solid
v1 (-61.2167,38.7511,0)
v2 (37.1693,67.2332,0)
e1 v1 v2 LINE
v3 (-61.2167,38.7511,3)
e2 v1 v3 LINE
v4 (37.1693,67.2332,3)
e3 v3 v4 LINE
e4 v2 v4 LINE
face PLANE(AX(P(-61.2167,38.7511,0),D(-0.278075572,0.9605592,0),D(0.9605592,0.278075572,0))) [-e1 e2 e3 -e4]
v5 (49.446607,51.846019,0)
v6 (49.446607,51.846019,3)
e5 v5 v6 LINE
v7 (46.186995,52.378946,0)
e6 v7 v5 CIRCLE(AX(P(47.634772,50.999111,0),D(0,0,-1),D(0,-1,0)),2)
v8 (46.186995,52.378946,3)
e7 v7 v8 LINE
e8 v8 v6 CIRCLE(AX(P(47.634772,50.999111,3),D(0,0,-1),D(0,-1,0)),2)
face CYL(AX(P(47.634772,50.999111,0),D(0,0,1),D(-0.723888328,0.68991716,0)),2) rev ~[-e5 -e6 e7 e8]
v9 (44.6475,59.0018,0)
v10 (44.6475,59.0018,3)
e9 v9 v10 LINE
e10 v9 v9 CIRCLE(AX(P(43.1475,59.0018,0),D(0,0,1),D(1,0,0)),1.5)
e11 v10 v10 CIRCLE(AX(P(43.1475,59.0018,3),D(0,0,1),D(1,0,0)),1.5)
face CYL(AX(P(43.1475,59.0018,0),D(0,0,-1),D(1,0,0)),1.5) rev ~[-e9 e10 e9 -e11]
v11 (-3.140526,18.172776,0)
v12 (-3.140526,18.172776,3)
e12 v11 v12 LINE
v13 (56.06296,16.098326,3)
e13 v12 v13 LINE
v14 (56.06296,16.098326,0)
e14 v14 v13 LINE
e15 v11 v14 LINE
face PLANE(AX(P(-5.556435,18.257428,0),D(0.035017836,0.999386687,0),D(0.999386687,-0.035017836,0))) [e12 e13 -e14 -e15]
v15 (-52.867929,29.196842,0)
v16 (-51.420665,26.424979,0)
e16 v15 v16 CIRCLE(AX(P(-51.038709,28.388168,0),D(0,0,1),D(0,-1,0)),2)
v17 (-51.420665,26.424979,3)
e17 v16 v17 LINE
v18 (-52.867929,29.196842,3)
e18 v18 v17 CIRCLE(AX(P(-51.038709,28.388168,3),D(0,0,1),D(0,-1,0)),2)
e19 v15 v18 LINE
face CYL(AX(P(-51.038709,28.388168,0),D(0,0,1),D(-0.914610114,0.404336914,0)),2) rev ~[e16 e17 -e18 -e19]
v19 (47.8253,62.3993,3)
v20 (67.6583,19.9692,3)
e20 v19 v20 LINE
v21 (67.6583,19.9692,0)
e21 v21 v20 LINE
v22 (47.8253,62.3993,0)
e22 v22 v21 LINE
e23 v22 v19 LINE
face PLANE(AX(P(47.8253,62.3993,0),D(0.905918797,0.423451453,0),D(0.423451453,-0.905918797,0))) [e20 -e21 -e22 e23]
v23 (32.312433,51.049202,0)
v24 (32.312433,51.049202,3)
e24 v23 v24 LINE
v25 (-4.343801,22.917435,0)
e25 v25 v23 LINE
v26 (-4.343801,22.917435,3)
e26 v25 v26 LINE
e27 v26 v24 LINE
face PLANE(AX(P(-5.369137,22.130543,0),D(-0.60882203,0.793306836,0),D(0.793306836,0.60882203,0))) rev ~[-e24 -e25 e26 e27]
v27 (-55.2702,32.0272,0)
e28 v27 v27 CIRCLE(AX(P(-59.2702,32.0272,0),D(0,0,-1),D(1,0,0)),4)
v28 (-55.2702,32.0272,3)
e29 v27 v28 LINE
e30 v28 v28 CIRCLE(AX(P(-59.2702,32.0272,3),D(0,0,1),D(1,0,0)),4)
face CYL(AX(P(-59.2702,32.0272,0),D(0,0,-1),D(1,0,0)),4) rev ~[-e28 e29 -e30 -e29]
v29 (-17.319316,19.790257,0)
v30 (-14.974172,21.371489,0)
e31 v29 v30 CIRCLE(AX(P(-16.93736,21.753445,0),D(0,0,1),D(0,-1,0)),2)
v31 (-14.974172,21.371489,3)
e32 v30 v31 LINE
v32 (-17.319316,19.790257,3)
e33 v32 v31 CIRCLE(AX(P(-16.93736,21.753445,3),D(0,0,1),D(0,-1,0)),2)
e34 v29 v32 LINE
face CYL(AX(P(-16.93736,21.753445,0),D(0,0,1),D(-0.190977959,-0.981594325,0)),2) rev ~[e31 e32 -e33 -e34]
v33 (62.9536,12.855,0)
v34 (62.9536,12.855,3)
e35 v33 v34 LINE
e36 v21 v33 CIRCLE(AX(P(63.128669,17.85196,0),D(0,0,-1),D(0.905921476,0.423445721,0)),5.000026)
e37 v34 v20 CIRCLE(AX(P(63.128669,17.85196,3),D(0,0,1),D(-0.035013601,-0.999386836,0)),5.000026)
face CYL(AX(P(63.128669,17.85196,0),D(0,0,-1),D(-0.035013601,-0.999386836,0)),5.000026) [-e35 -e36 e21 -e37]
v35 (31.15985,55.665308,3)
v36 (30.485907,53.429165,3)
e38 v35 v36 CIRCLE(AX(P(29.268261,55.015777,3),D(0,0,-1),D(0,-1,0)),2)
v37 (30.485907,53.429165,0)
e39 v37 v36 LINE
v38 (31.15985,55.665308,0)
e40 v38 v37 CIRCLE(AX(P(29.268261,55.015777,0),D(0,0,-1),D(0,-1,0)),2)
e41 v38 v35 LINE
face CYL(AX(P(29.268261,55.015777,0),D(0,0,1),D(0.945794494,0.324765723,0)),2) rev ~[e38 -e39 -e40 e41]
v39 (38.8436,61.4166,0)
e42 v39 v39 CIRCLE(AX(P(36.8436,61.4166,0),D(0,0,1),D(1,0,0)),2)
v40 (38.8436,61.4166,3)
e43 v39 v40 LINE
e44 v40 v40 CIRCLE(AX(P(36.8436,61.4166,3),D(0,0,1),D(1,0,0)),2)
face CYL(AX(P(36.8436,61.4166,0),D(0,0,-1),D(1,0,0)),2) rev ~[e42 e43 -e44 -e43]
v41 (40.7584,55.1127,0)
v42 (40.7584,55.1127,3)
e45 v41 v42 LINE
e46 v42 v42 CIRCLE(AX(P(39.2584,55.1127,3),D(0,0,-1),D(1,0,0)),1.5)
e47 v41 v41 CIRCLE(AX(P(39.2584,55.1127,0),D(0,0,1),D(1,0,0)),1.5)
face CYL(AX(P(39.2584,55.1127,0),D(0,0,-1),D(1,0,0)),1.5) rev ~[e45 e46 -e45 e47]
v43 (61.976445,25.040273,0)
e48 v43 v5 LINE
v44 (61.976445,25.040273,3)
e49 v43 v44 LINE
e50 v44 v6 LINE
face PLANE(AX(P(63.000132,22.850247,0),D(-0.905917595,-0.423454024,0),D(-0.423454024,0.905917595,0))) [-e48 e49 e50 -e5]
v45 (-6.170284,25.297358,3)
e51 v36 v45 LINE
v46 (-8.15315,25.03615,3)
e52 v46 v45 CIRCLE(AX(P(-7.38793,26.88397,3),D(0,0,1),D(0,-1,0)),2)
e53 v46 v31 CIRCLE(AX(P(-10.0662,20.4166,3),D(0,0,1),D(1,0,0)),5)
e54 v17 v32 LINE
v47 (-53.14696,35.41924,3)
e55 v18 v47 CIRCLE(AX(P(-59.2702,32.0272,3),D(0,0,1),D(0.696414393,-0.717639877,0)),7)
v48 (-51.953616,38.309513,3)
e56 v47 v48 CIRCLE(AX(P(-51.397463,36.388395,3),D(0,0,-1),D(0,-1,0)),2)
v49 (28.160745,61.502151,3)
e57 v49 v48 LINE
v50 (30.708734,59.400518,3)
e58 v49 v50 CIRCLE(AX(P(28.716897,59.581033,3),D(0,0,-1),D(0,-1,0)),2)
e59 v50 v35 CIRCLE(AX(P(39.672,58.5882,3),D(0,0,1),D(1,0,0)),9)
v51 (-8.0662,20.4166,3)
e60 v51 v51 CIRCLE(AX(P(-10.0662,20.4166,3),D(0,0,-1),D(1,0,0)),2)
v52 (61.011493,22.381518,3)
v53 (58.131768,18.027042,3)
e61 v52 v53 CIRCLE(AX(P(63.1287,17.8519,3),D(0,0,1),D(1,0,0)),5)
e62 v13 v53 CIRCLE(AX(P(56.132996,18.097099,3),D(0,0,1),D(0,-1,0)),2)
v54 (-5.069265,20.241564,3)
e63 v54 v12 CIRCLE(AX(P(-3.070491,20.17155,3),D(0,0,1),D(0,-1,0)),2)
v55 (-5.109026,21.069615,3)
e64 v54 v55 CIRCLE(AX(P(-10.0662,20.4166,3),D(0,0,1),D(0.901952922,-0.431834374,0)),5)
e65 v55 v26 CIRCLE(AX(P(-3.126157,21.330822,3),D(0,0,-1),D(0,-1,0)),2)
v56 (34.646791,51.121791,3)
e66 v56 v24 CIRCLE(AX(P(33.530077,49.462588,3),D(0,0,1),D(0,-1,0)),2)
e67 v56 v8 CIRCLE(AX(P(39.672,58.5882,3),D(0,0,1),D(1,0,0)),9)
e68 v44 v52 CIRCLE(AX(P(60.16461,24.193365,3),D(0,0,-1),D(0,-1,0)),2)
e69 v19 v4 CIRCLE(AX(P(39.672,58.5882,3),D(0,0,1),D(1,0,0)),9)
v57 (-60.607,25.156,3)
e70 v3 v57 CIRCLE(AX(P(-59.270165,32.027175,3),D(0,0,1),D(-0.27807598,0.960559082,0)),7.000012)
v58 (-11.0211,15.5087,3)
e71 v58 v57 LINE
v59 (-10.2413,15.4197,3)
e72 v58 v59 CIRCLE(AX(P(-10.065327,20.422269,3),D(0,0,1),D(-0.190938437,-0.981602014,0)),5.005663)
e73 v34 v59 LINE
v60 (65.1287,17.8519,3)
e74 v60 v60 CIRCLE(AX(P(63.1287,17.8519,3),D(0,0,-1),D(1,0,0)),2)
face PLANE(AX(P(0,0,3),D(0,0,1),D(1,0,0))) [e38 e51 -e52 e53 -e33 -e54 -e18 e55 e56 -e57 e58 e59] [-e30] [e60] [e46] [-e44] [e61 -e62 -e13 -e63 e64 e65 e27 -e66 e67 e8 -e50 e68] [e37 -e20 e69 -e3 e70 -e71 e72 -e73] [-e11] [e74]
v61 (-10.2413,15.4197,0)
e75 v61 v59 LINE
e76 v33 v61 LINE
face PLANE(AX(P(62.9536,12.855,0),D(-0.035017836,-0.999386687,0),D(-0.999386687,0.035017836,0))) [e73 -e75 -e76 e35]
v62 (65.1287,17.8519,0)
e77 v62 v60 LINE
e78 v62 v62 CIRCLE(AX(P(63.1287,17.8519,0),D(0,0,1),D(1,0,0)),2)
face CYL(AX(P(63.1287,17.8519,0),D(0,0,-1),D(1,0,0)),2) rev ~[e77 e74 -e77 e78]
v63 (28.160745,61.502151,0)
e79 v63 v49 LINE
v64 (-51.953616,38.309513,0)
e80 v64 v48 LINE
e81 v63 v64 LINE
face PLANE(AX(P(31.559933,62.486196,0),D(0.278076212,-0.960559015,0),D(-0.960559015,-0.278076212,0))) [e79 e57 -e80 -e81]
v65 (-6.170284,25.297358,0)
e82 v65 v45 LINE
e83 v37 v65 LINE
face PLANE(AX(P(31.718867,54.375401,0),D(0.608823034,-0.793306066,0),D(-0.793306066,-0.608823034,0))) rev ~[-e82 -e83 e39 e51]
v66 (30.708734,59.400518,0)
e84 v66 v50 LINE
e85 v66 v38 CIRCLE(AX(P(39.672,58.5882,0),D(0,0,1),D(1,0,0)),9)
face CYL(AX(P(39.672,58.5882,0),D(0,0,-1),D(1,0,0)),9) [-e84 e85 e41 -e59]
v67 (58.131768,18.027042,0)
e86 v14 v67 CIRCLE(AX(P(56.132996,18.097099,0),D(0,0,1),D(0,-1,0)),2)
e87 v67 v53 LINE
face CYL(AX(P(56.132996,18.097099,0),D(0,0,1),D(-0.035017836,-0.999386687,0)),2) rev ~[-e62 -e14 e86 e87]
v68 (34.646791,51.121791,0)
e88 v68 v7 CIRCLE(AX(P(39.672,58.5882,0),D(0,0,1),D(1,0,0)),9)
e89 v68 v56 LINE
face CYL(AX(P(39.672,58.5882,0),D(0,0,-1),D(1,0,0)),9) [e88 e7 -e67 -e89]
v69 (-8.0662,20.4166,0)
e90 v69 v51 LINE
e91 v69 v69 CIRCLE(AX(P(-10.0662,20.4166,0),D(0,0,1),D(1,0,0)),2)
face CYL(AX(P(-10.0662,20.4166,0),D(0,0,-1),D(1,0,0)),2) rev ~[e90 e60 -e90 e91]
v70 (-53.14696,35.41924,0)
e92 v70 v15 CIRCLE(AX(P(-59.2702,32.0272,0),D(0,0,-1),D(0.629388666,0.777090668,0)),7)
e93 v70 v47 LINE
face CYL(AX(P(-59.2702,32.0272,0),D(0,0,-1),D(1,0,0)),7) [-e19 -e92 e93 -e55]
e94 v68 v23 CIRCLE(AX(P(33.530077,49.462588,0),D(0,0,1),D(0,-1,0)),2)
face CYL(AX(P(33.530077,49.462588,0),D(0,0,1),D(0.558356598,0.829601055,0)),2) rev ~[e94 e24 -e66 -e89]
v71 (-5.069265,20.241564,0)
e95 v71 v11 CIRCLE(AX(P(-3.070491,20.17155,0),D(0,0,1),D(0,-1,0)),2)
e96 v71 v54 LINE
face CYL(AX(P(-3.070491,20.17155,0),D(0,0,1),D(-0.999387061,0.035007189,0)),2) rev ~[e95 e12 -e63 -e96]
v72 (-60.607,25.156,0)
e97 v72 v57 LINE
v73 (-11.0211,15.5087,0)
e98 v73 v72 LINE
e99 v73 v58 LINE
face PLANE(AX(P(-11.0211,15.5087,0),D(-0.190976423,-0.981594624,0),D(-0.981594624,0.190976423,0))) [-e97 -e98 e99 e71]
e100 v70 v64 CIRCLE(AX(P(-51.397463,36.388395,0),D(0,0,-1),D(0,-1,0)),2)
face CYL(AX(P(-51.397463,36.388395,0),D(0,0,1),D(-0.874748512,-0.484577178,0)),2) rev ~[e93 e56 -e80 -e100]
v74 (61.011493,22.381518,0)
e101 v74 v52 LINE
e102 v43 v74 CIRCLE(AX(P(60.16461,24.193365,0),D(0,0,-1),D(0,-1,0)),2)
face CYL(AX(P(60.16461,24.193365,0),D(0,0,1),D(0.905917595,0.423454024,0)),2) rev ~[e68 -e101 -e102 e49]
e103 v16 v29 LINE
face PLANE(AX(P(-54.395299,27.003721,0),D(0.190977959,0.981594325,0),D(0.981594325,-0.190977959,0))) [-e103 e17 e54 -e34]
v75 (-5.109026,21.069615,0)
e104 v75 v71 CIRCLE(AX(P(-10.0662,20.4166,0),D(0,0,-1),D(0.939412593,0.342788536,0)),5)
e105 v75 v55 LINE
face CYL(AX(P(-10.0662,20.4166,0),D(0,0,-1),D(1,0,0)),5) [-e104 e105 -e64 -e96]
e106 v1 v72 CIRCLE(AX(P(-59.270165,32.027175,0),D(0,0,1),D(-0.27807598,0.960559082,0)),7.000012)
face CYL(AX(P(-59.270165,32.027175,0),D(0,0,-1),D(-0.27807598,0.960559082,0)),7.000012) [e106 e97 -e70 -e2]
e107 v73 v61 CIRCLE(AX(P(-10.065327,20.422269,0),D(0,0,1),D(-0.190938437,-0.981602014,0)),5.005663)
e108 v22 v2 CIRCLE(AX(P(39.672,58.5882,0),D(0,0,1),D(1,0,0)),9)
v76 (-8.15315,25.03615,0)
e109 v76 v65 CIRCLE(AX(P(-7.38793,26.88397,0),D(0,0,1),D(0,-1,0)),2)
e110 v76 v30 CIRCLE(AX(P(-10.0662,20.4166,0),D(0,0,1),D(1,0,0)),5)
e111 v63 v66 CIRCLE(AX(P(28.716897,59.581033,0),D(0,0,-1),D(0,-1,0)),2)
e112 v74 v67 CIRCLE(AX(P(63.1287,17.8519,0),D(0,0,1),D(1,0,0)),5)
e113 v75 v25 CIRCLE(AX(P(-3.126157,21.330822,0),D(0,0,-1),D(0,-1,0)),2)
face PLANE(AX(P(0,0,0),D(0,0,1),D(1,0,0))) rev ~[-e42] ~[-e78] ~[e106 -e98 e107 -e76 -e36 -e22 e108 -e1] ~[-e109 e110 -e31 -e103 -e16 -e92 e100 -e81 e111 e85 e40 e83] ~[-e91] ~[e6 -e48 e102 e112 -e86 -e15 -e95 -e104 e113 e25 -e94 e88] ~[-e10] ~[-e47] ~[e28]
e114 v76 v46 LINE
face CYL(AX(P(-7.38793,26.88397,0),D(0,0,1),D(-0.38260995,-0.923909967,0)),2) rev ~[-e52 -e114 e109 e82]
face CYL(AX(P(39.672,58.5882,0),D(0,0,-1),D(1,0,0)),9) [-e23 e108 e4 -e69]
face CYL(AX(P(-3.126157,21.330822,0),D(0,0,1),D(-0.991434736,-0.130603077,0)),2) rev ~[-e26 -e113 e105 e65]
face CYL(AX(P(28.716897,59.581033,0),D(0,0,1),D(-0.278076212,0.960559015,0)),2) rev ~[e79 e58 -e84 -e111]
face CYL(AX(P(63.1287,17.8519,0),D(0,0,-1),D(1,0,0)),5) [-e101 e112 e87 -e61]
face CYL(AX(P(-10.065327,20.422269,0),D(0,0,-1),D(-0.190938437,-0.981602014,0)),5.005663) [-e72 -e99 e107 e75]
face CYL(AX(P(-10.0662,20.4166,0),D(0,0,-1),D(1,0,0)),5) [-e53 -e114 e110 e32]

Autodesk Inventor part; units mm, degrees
ref_plane "YZ Plane" through (0, 0, 0) normal (1, 0, 0) x (0, 1, 0)
ref_plane "XZ Plane" through (0, 0, 0) normal (0, 1, 0) x (-1, 0, 0)
ref_plane "XY Plane" through (0, 0, 0) normal (0, 0, 1) x (1, 0, 0)
sketch "スケッチ1" plane through (0, 0, 0) normal (0, 0, 1) x (1, 0, 0)
  circle A0 centre (-11.4931, -19.1593) radius 14 construction
  circle A1 centre (16.245, -15.3385) radius 14 construction
  line L0 (-170.915, -81.4118) -> (490.0044, -81.4118)
  line L1 (-197.2268, -33.1593) -> (179.6604, -33.1593) construction
  line L2 (-178.6504, 68.5882) -> (447.0756, 68.5882) construction
  circle A2 centre (-11.4931, -19.1593) radius 14 construction
  circle A3 centre (-21.8854, 6.8407) radius 14 construction
  circle A4 centre (-0.5211, 0.3031) radius 20.05 construction
  circle A5 centre (-0.5211, 0.3031) radius 22.3421 construction
  circle A6 centre (0, 0) radius 22.3421 construction
  circle A7 centre (-0.5211, 0.3031) radius 5.05 construction
  circle A8 centre (19.689, 29.6103) radius 30.55 construction
  circle A9 centre (19.689, 29.6103) radius 10.1 construction
  circle A10 centre (39.672, 58.5882) radius 25.1 construction
  line L3 (-0.5211, 0.3031) -> (39.672, 58.5882) construction
  circle A11 centre (39.672, 58.5882) radius 27.1 construction
  circle A12 centre (19.689, 29.6103) radius 31.55 construction
  circle A13 centre (19.689, 29.6103) radius 12.1 construction
  circle A14 centre (-0.5211, 0.3031) radius 20.55 construction
  circle A15 centre (-0.5211, 0.3031) radius 6.05 construction
  circle A16 centre (36.8436, 61.4166) radius 4 construction
  circle A17 centre (36.8436, 61.4166) radius 2
  line L4 (36.8436, 61.4166) -> (39.672, 58.5882)
  line L5 (39.672, 58.5882) -> (22.909, 61.4166) construction
  circle A18 centre (22.909, 61.4166) radius 2
  circle A19 centre (22.909, 61.4166) radius 5
  line L6 (28.2635, 50.4737) -> (31.5576, 69.9968) construction
  line L7 (31.5576, 69.9968) -> (51.0806, 66.7027) construction
  line L8 (51.0806, 66.7027) -> (47.7865, 47.1796) construction
  line L9 (47.7865, 47.1796) -> (28.2635, 50.4737) construction
  circle A20 centre (39.672, 58.5882) radius 9
  circle A21 centre (28.2635, 50.4737) radius 2.5
  circle A22 centre (47.7865, 47.1796) radius 2.5
  circle A23 centre (51.0806, 66.7027) radius 2.5
  circle A24 centre (31.5576, 69.9968) radius 2.5
  circle A25 centre (28.2635, 50.4737) radius 5
  line L10 (22.909, 61.4166) -> (36.8436, 61.4166) construction
  line L11 (-26.0808, 51.4166) -> (-426.0808, 51.4166)
  line L12 (-26.0808, 24.4166) -> (23.9192, 24.4166)
  circle A26 centre (39.672, 58.5882) radius 17.5
  circle A27 centre (47.7865, 47.1796) radius 2.1
  circle A28 centre (28.2635, 50.4737) radius 2.1
  circle A29 centre (31.5576, 69.9968) radius 2.1
  circle A30 centre (51.0806, 66.7027) radius 2.1
  circle A31 centre (47.7865, 47.1796) radius 5
  circle A32 centre (31.5576, 69.9968) radius 5
  circle A33 centre (51.0806, 66.7027) radius 5
  circle A34 centre (39.672, 58.5882) radius 19.5
  circle A35 centre (39.672, 58.5882) radius 20.5
  line L13 (20.7504, 89.6882) -> (53.4998, 89.6882)
  line L14 (53.4998, 89.6882) -> (73.6516, 68.9857)
  line L15 (20.7504, 89.6882) -> (-13.977, 39.0272)
  circle A36 centre (-59.2702, 32.0272) radius 5.025 construction
  circle A37 centre (-59.2702, 32.0272) radius 4
  arc A38 (-59.2702, 39.0272) -> (-62.5897, 25.8643) centre (-59.2702, 32.0272) ccw
  line L16 (-59.2702, 39.0272) -> (-13.977, 39.0272)
  line L17 (-62.5897, 25.8643) -> (-36.5547, 11.8407)
  line L18 (-36.5547, 11.8407) -> (-36.5547, -33.1593)
  arc A39 (74.5655, 64.0796) -> (73.6516, 68.9857) centre (70.4271, 65.8469) ccw
  circle A40 centre (8.5193, 63.8863) radius 4.5 construction
  arc A41 (59.4085, 28.8085) -> (59.8353, 29.5856) centre (55.6969, 31.3528) ccw
  circle A42 centre (23.6647, -6.2198) radius 4.5
  circle A43 centre (-16.0241, 34.5272) radius 4.5 construction
  line L19 (59.8353, 29.5856) -> (74.5655, 64.0796)
  line L20 (32.172, 89.6882) -> (32.172, 92.6882)
  line L21 (32.172, 92.6882) -> (47.172, 92.6882)
  line L22 (47.172, 92.6882) -> (47.172, 89.6882)
  line L23 (35.172, 89.6882) -> (35.172, 86.6882)
  line L24 (35.172, 86.6882) -> (44.172, 86.6882)
  line L25 (44.172, 86.6882) -> (44.172, 89.6882)
  circle A44 centre (70.4271, 65.8469) radius 1.5
  circle A45 centre (55.6969, 31.3528) radius 1.5
  circle A46 centre (23.6647, -6.2198) radius 1.5
  circle A47 centre (-16.0241, 34.5272) radius 1.5
  circle A48 centre (8.5193, 63.8863) radius 1.5
  circle A49 centre (-10.0662, 20.4166) radius 4 construction
  circle A50 centre (-10.0662, 20.4166) radius 2
  line L26 (1.9305, -36.1593) -> (16.9305, -36.1593)
  line L27 (16.9305, -36.1593) -> (16.9305, -33.1593)
  line L28 (1.9305, -33.1593) -> (1.9305, -36.1593)
  arc A51 (1.9305, -33.1593) -> (-0.1695, -33.1593) centre (0.8805, -33.1593) ccw
  line L29 (13.9305, -30.1593) -> (13.9305, -33.1593)
  arc A52 (13.9305, -30.1593) -> (11.8305, -30.1593) centre (12.8805, -30.1593) ccw
  line L30 (7.0305, -30.1593) -> (11.8305, -30.1593)
  arc A53 (7.0305, -30.1593) -> (4.9305, -30.1593) centre (5.9805, -30.1593) ccw
  line L31 (4.9305, -33.1593) -> (4.9305, -30.1593)
  arc A54 (4.9305, -33.1593) -> (7.0305, -33.1593) centre (5.9805, -33.1593) ccw
  arc A55 (11.8305, -33.1593) -> (13.9305, -33.1593) centre (12.8805, -33.1593) ccw
  line L32 (-36.5547, -36.1593) -> (-21.5547, -36.1593)
  line L33 (-21.5547, -36.1593) -> (-21.5547, -33.1593)
  arc A56 (-19.4547, -33.1593) -> (-21.5547, -33.1593) centre (-20.5047, -33.1593) ccw
  line L34 (-36.5547, -33.1593) -> (-36.5547, -36.1593)
  arc A57 (-33.5547, -33.1593) -> (-31.4547, -33.1593) centre (-32.5047, -33.1593) ccw
  line L35 (-33.5547, -33.1593) -> (-33.5547, -30.1593)
  arc A58 (-31.4547, -30.1593) -> (-33.5547, -30.1593) centre (-32.5047, -30.1593) ccw
  line L36 (-31.4547, -30.1593) -> (-26.6547, -30.1593)
  arc A59 (-24.5547, -30.1593) -> (-26.6547, -30.1593) centre (-25.6047, -30.1593) ccw
  line L37 (-24.5547, -30.1593) -> (-24.5547, -33.1593)
  arc A60 (-26.6547, -33.1593) -> (-24.5547, -33.1593) centre (-25.6047, -33.1593) ccw
  line L38 (59.4085, 28.8085) -> (16.9305, -33.1593)
  circle A61 centre (-21.8854, 6.8407) radius 5
  circle A62 centre (-11.4931, -19.1593) radius 5
  line L39 (-31.4547, -33.1593) -> (-26.6547, -33.1593)
  line L40 (-19.4547, -33.1593) -> (-0.1695, -33.1593)
  line L41 (7.0305, -33.1593) -> (11.8305, -33.1593)
  line L42 (0.4485, -25.8914) -> (-27.1419, -10.3373) construction
  line L43 (-27.1419, -10.3373) -> (-17.3768, 21.5744) construction
  circle A63 centre (-21.8854, 6.8407) radius 8
  circle A64 centre (-11.4931, -19.1593) radius 8
  circle A65 centre (-19.5445, 14.4905) radius 1.3
  circle A66 centre (-24.2262, -0.8092) radius 1.3
  circle A67 centre (-18.4619, -15.2306) radius 1.3
  circle A68 centre (-4.5242, -23.088) radius 1.3
  circle A69 centre (-0.5211, 0.3031) radius 4.5
  circle A70 centre (19.689, 29.6103) radius 6
  arc A71 (65.9325, 14.9991) -> (66.6936, 19.6662) centre (63.1287, 17.8519) ccw
  line L44 (16.9305, -33.1593) -> (65.9325, 14.9991)
  line L45 (66.6936, 19.6662) -> (60.6612, 31.5196)
  circle A72 centre (63.1287, 17.8519) radius 2
  dimension "d0" = 150
  dimension "d1" = 28
  dimension "d2" = 28
  dimension "d3" = 40.1
  dimension "d4" = 10.1
  dimension "d5" = 61.1
  dimension "d6" = 20.2
  dimension "d7" = 50.2
  dimension "d8" = 10
  dimension "d9" = 2
  dimension "d10" = 1
  dimension "d11" = 2
  dimension "d12" = 0.5
  dimension "d13" = 1
  dimension "d14" = 40
  dimension "d15" = 8
  dimension "d16" = 4
  dimension "d17" = 4
  dimension "d18" = 45
  dimension "d19" = 17
  dimension "d20" = 4
  dimension "d21" = 3
  dimension "d22" = 1
  dimension "d23" = 5
  dimension "d24" = 5
  dimension "d25" = 5
  dimension "d26" = 5
  dimension "d27" = 10
  dimension "d28" = 400
  dimension "d29" = 10
  dimension "d30" = 50
  dimension "d31" = 50
  dimension "d32" = 27
  dimension "d33" = 27
  dimension "d34" = 35
  dimension "d35" = 4.2
  dimension "d36" = 4.2
  dimension "d37" = 4.2
  dimension "d38" = 4.2
  dimension "d39" = 10
  dimension "d40" = 10
  dimension "d41" = 10
  dimension "d42" = 2
  dimension "d43" = 1
  dimension "d44" = 8
  dimension "d45" = 3
  dimension "d46" = 4
  dimension "d47" = 9
  dimension "d48" = 9
  dimension "d49" = 9
  dimension "d50" = 9
  dimension "d51" = 9
  dimension "d52" = 3
  dimension "d53" = 15
  dimension "d54" = 3
  dimension "d55" = 9
  dimension "d56" = 3
  dimension "d57" = 7.5
  dimension "d58" = 3
  dimension "d59" = 3
  dimension "d60" = 3
  dimension "d61" = 3
  dimension "d62" = 3
  dimension "d63" = 8
sketch "スケッチ2" plane through (0, 0, 0) normal (0, 0, 1) x (1, 0, 0)
  circle A0 centre (-59.2702, 32.0272) radius 4 projected
  circle A1 centre (63.1287, 17.8519) radius 2 projected
  circle A2 centre (-10.0662, 20.4166) radius 2 projected
  circle A3 centre (36.8436, 61.4166) radius 2 projected
  arc A4 (-61.2167, 38.7511) -> (-60.607, 25.156) centre (-59.2702, 32.0272) ccw
  arc A5 (-11.0211, 15.5087) -> (-10.2413, 15.4197) centre (-10.0662, 20.4166) ccw
  arc A6 (62.9536, 12.855) -> (67.6583, 19.9692) centre (63.1287, 17.8519) ccw
  circle A7 centre (39.672, 58.5882) radius 9 projected
  circle A8 centre (39.672, 58.5882) radius 7 construction
  circle A9 centre (43.1475, 59.0018) radius 1.5
  circle A10 centre (39.2584, 55.1127) radius 1.5
  line L0 (43.1475, 59.0018) -> (39.2584, 55.1127) construction
  line L1 (39.2584, 55.1127) -> (36.8436, 61.4166) construction
  line L2 (36.8436, 61.4166) -> (43.1475, 59.0018) construction
  line L3 (36.8436, 61.4166) -> (41.203, 57.0573) construction
  line L4 (-61.2167, 38.7511) -> (37.1693, 67.2332)
  line L5 (47.8253, 62.3993) -> (67.6583, 19.9692)
  line L6 (62.9536, 12.855) -> (-10.2413, 15.4197)
  line L7 (-11.0211, 15.5087) -> (-60.607, 25.156)
  line L8 (39.672, 58.5882) -> (-10.0662, 20.4166) construction
  line L9 (38.7588, 59.7782) -> (-10.9794, 21.6066)
  line L10 (-9.1529, 19.2267) -> (40.5853, 57.3982)
  arc A11 (40.5853, 57.3982) -> (38.7588, 59.7782) centre (39.672, 58.5882) ccw
  arc A12 (-10.9794, 21.6066) -> (-9.1529, 19.2267) centre (-10.0662, 20.4166) ccw
  line L11 (38.0036, 64.3516) -> (-60.3825, 35.8694)
  arc A13 (-60.3825, 35.8694) -> (-60.0341, 28.1008) centre (-59.2702, 32.0272) ccw
  line L12 (-60.0341, 28.1008) -> (-10.4481, 18.4534)
  arc A14 (-10.4481, 18.4534) -> (-10.1362, 18.4179) centre (-10.0662, 20.4166) ccw
  line L13 (-10.1362, 18.4179) -> (63.0587, 15.8532)
  arc A15 (63.0587, 15.8532) -> (64.9406, 18.6989) centre (63.1287, 17.8519) ccw
  line L14 (64.9406, 18.6989) -> (45.1075, 61.1289)
  circle A16 centre (-59.2702, 32.0272) radius 7
  circle A17 centre (-10.0662, 20.4166) radius 5
  circle A18 centre (63.1287, 17.8519) radius 5
  point P0 (0, 0)
  point P1 (14.8029, 39.5024)
  point P2 (-7.1956, 24.5105)
  point P3 (-14.9464, 19.3286)
  point P4 (-54.3952, 27.0037)
  point P5 (-54.8645, 37.4668)
  point P6 (31.5599, 62.4862)
  point P7 (31.7189, 54.3754)
  point P8 (-5.5565, 18.2574)
  point P9 (-5.3691, 22.1306)
  point P10 (33.5454, 51.9955)
  point P11 (47.9481, 55.0518)
  point P12 (63.0001, 22.8503)
  point P13 (58.4789, 16.0136)
  dimension "d77" = 3
  dimension "d78" = 3
  dimension "d80" = 3
  dimension "d82" = 14
  dimension "d83" = 3
  dimension "d84" = 3
  dimension "d85" = 5.5
  dimension "d86" = 3.5
  dimension "d87" = 3
  dimension "d88" = 3
  dimension "d89" = 3
  dimension "d90" = 3
  dimension "d91" = 3
extrude "押し出し1" add sketch "スケッチ2" along normal blind 3 contours A0 L11 A16 L12 | A0 L12 A16 A4 L11 | A16 L4 A7 L11 | L12 A17 L7 A16 | A7 L10 A10 A11 L9 | A17 L9 A2 L12 | L12 A2 L13 A17 A5 | L9 A11 L10 A10 A7 | A7 L10 A17 L9 | A17 L10 A2 L9 | L5 A18 L14 A7 | A2 L10 A17 L13 | A17 L13 A18 L6 | A6 A18 L13 A1 L14 | L14 A1 L13 A18
fillet "フィレット1" radius 2 12 edges at (-5.5565, 18.2574, 1.5) (-5.3691, 22.1306, 1.5) (58.4789, 16.0136, 1.5) (63.0001, 22.8503, 1.5) (47.9481, 55.0518, 1.5) (33.5454, 51.9955, 1.5) (-7.1956, 24.5105, 1.5) (-14.9464, 19.3286, 1.5) (31.7189, 54.3754, 1.5) (31.5599, 62.4862, 1.5) (-54.8645, 37.4668, 1.5) (-54.3952, 27.0037, 1.5)
properties part number "横回転首振りフレーム３" material "アルミニウム 2014-T4"
